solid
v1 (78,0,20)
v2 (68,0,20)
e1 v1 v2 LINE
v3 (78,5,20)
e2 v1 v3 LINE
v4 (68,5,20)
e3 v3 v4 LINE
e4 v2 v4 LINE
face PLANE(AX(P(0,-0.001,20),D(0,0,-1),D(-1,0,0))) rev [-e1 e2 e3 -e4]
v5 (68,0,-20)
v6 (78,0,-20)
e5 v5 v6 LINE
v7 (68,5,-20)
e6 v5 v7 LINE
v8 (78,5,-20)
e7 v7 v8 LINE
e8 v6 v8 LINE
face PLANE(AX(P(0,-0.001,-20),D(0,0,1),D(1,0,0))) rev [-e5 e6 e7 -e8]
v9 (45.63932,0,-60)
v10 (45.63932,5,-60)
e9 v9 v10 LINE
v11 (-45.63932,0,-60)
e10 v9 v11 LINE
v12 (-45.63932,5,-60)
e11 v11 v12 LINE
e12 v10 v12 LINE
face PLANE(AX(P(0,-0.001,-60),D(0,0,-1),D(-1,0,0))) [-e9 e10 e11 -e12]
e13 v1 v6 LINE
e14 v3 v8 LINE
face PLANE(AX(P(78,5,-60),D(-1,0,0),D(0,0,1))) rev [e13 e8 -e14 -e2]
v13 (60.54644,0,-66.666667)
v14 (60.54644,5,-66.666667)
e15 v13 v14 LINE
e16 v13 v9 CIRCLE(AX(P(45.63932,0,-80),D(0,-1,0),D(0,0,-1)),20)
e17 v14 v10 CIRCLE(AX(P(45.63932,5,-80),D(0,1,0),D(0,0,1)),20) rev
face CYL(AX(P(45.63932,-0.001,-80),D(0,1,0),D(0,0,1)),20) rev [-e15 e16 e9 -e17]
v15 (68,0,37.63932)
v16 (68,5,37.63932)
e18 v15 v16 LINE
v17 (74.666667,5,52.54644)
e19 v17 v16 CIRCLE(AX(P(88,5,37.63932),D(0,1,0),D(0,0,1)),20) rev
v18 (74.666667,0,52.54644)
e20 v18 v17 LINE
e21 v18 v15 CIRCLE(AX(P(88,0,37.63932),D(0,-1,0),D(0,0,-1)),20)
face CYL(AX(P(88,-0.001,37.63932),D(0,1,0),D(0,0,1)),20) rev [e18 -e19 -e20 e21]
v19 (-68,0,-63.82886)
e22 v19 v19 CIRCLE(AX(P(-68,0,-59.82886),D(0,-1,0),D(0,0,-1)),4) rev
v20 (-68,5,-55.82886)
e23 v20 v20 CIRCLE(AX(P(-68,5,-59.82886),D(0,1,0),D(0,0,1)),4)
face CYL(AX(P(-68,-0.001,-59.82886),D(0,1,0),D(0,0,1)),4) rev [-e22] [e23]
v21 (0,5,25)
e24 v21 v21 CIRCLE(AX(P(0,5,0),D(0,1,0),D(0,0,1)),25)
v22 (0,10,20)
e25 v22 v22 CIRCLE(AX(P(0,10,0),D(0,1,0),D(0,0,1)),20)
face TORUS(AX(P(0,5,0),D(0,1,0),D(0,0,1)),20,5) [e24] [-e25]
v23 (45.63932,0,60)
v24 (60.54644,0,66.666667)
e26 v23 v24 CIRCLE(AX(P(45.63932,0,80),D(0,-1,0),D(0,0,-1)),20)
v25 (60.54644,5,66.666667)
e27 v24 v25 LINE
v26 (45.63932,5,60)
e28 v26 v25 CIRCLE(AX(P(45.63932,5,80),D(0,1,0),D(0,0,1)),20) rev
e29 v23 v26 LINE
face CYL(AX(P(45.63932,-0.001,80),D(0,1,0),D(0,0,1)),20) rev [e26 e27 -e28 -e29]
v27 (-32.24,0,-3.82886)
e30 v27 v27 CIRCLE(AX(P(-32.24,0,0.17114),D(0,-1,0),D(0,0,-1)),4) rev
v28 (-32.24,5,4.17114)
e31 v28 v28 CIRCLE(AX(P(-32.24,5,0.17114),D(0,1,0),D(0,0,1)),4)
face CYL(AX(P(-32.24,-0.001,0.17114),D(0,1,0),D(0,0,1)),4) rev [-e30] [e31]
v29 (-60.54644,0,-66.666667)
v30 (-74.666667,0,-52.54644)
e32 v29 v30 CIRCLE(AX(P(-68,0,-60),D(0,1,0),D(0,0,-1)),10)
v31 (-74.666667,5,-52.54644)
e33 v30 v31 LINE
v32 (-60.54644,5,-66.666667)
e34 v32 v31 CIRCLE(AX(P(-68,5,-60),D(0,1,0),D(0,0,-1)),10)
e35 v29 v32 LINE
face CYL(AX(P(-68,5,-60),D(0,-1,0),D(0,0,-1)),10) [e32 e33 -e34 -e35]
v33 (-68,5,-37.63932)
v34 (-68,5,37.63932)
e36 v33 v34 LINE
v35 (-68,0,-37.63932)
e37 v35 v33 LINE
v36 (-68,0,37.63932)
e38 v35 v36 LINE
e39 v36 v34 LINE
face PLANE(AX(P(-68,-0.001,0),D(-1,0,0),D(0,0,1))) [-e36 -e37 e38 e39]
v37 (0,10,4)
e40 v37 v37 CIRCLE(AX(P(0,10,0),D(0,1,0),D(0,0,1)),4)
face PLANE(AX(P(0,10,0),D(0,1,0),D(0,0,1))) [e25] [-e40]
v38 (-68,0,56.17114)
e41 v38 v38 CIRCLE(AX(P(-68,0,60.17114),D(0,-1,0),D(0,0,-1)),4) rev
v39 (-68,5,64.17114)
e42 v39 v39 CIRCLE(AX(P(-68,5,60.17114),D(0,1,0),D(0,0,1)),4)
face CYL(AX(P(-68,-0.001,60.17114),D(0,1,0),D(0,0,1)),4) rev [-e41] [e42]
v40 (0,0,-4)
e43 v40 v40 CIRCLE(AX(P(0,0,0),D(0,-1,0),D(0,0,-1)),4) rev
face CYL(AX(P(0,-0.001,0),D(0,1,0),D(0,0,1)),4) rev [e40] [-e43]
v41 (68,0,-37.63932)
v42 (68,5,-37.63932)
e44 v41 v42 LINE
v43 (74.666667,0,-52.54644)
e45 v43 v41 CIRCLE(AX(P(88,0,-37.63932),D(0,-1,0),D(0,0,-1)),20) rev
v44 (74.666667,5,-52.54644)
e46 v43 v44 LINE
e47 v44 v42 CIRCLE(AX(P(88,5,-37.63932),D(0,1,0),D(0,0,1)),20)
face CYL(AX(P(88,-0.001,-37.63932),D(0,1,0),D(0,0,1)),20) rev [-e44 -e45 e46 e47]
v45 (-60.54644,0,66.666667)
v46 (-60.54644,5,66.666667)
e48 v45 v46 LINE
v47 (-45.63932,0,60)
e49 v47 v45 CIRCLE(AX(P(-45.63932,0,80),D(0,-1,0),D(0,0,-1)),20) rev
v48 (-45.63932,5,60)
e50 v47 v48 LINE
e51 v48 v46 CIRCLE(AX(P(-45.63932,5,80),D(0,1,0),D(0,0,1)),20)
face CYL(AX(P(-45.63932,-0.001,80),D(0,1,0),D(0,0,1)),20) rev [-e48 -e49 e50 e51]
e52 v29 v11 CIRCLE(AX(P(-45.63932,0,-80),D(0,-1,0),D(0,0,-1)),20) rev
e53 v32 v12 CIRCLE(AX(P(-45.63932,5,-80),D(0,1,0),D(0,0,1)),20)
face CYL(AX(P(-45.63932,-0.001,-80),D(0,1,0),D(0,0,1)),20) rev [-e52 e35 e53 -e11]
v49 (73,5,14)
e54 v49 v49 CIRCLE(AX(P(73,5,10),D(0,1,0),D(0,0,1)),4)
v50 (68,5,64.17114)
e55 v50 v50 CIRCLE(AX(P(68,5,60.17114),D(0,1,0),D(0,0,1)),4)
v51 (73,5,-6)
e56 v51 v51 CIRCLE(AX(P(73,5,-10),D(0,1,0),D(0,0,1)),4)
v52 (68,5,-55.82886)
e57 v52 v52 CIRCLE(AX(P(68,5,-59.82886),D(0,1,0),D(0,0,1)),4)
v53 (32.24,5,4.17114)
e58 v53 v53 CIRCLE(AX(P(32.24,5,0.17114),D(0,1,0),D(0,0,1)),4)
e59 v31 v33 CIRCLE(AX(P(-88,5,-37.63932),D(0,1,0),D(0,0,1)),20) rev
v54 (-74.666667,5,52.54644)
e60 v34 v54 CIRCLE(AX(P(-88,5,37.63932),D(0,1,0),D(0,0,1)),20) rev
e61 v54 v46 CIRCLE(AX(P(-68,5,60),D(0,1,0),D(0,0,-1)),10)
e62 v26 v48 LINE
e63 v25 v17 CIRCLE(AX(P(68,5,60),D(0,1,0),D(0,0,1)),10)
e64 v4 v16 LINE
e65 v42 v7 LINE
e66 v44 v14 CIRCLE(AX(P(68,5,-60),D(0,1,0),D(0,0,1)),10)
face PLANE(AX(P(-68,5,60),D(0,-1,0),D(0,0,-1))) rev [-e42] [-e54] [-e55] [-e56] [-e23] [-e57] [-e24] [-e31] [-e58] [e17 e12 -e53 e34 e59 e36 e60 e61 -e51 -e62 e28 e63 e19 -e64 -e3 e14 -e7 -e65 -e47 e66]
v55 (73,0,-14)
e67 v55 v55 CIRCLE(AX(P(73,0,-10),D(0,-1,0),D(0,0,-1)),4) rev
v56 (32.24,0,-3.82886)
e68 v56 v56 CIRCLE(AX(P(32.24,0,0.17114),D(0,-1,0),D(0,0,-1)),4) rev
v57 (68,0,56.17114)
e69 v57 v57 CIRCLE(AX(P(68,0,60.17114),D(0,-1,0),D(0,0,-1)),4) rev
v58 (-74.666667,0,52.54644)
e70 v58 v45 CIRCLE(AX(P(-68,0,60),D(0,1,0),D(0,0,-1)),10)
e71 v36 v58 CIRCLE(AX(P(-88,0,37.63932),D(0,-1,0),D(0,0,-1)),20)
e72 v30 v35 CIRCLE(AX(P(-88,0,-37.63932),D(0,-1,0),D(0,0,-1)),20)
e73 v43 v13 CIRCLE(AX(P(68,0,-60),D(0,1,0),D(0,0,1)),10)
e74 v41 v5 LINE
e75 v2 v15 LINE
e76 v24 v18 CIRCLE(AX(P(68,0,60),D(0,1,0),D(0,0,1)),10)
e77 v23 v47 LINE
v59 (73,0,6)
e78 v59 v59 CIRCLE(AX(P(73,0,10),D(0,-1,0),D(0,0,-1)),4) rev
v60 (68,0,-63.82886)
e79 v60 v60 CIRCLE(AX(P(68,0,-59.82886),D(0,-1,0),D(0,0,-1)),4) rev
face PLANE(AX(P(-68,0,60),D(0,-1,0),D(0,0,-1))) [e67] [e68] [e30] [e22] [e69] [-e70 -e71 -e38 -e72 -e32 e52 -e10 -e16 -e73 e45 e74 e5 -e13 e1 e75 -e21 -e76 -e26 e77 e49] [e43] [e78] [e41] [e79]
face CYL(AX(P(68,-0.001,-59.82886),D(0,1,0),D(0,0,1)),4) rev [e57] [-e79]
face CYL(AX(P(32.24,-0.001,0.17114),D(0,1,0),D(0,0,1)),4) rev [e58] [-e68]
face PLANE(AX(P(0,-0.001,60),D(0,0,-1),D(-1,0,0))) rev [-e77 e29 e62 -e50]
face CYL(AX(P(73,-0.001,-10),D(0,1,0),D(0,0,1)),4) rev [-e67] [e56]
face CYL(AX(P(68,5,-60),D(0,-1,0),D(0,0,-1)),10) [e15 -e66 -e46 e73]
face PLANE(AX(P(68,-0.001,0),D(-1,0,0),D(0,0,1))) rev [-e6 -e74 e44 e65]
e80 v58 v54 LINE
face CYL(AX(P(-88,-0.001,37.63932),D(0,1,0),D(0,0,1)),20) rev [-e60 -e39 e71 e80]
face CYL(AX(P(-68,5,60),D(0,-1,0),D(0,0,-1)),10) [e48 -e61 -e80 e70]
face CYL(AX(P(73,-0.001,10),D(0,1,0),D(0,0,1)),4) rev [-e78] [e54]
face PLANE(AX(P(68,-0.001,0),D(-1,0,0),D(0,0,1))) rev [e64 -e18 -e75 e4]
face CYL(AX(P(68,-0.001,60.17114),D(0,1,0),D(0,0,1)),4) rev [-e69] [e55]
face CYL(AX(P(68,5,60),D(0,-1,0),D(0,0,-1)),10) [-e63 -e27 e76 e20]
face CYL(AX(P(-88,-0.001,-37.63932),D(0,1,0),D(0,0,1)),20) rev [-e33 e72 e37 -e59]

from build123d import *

# Parameters (mm, degrees)
SALIENTE_EXTRUIR1_DEPTH = 5
CROQUIS3_R              = 25
SALIENTE_EXTRUIR2_DEPTH = 5
CORTAR_EXTRUIR1_REACH   = 107.281
CROQUIS4_R              = 4
CORTAR_EXTRUIR2_REACH   = 106.924
CROQUIS5_R              = 4
CORTAR_EXTRUIR8_REACH   = 106.924
CROQUIS12_R             = 4
REDONDEO2_R             = 5


with BuildPart() as part:
    # Croquis1 → Saliente-Extruir1 (new body)
    with BuildSketch(Plane(origin=(0, 0, 0), x_dir=(1, 0, 0), z_dir=(0, 1, 0))):
        with BuildLine():
            Line((78, 60), (78, -60))
            ThreePointArc((78, -60), (75.071067812, -67.071067812), (68, -70))
            Line((68, -70), (-68, -70))
            ThreePointArc((-68, -70), (-75.071067812, -67.071067812), (-78, -60))
            Line((-78, -60), (-78, 60))
            ThreePointArc((-78, 60), (-75.071067812, 67.071067812), (-68, 70))
            Line((-68, 70), (68, 70))
            ThreePointArc((68, 70), (75.071067812, 67.071067812), (78, 60))
        make_face()
    extrude(amount=SALIENTE_EXTRUIR1_DEPTH)

    # Croquis3 → Saliente-Extruir2 (add)
    with BuildSketch(Plane(origin=(0, 5, 0), x_dir=(1, 0, 0), z_dir=(0, 1, 0))):
        with Locations(Location((0, 0, 0), (0, 0, 270))):
            Circle(CROQUIS3_R)
    extrude(amount=SALIENTE_EXTRUIR2_DEPTH)

    # Croquis4 → Cortar-Extruir1 (cut, up to next)
    with BuildSketch(Plane(origin=(0, 10, 0), x_dir=(1, 0, 0), z_dir=(0, 1, 0)), mode=Mode.PRIVATE) as cortar_extruir1_sk1:
        with Locations(Location((0, 0, 0), (0, 0, 270))):
            Circle(CROQUIS4_R)
    cortar_extruir1_tool1 = extrude(cortar_extruir1_sk1.sketch, amount=-CORTAR_EXTRUIR1_REACH, mode=Mode.PRIVATE) & part.part
    add(cortar_extruir1_tool1.solids().sort_by_distance((0, 10, 0))[0], mode=Mode.SUBTRACT)

    # Croquis5 → Cortar-Extruir2 (cut, up to next)
    with BuildSketch(Plane(origin=(0, 5, 0), x_dir=(1, 0, 0), z_dir=(0, 1, 0)), mode=Mode.PRIVATE) as cortar_extruir2_sk1:
        with Locations(Location((-68, -60.171139927, 0), (0, 0, 270))):
            Circle(CROQUIS5_R)
    cortar_extruir2_tool1 = extrude(cortar_extruir2_sk1.sketch, amount=-CORTAR_EXTRUIR2_REACH, mode=Mode.PRIVATE) & part.part
    # Croquis5 → Cortar-Extruir2 (cut, up to next)
    with BuildSketch(Plane(origin=(0, 5, 0), x_dir=(1, 0, 0), z_dir=(0, 1, 0)), mode=Mode.PRIVATE) as cortar_extruir2_sk2:
        with Locations(Location((-68, 59.828860073, 0), (0, 0, 270))):
            Circle(CROQUIS5_R)
    cortar_extruir2_tool2 = extrude(cortar_extruir2_sk2.sketch, amount=-CORTAR_EXTRUIR2_REACH, mode=Mode.PRIVATE) & part.part
    # Croquis5 → Cortar-Extruir2 (cut, up to next)
    with BuildSketch(Plane(origin=(0, 5, 0), x_dir=(1, 0, 0), z_dir=(0, 1, 0)), mode=Mode.PRIVATE) as cortar_extruir2_sk3:
        with Locations(Location((68, -60.171139927, 0), (0, 0, 270))):
            Circle(CROQUIS5_R)
    cortar_extruir2_tool3 = extrude(cortar_extruir2_sk3.sketch, amount=-CORTAR_EXTRUIR2_REACH, mode=Mode.PRIVATE) & part.part
    # Croquis5 → Cortar-Extruir2 (cut, up to next)
    with BuildSketch(Plane(origin=(0, 5, 0), x_dir=(1, 0, 0), z_dir=(0, 1, 0)), mode=Mode.PRIVATE) as cortar_extruir2_sk4:
        with Locations(Location((68, 59.828860073, 0), (0, 0, 270))):
            Circle(CROQUIS5_R)
    cortar_extruir2_tool4 = extrude(cortar_extruir2_sk4.sketch, amount=-CORTAR_EXTRUIR2_REACH, mode=Mode.PRIVATE) & part.part
    # Croquis5 → Cortar-Extruir2 (cut, up to next)
    with BuildSketch(Plane(origin=(0, 5, 0), x_dir=(1, 0, 0), z_dir=(0, 1, 0)), mode=Mode.PRIVATE) as cortar_extruir2_sk5:
        with Locations(Location((32.24, -0.171139927, 0), (0, 0, 270))):
            Circle(CROQUIS5_R)
    cortar_extruir2_tool5 = extrude(cortar_extruir2_sk5.sketch, amount=-CORTAR_EXTRUIR2_REACH, mode=Mode.PRIVATE) & part.part
    # Croquis5 → Cortar-Extruir2 (cut, up to next)
    with BuildSketch(Plane(origin=(0, 5, 0), x_dir=(1, 0, 0), z_dir=(0, 1, 0)), mode=Mode.PRIVATE) as cortar_extruir2_sk6:
        with Locations(Location((-32.24, -0.171139927, 0), (0, 0, 270))):
            Circle(CROQUIS5_R)
    cortar_extruir2_tool6 = extrude(cortar_extruir2_sk6.sketch, amount=-CORTAR_EXTRUIR2_REACH, mode=Mode.PRIVATE) & part.part
    add(cortar_extruir2_tool1.solids().sort_by_distance((-68, 5, 60.17114))[0], mode=Mode.SUBTRACT)
    add(cortar_extruir2_tool2.solids().sort_by_distance((-68, 5, -59.82886))[0], mode=Mode.SUBTRACT)
    add(cortar_extruir2_tool3.solids().sort_by_distance((68, 5, 60.17114))[0], mode=Mode.SUBTRACT)
    add(cortar_extruir2_tool4.solids().sort_by_distance((68, 5, -59.82886))[0], mode=Mode.SUBTRACT)
    add(cortar_extruir2_tool5.solids().sort_by_distance((32.24, 5, 0.17114))[0], mode=Mode.SUBTRACT)
    add(cortar_extruir2_tool6.solids().sort_by_distance((-32.24, 5, 0.17114))[0], mode=Mode.SUBTRACT)

    # Croquis12 → Cortar-Extruir8 (cut, up to next)
    with BuildSketch(Plane(origin=(0, 5, 0), x_dir=(1, 0, 0), z_dir=(0, 1, 0)), mode=Mode.PRIVATE) as cortar_extruir8_sk1:
        with BuildLine():
            Line((68, 70), (-68, 70))
            ThreePointArc((-68, 70), (-63.917517095, 69.128709292), (-60.546440075, 66.666666667))
            ThreePointArc((-60.546440075, 66.666666667), (-53.804286034, 61.742581416), (-45.639320225, 60))
            Line((-45.639320225, 60), (45.639320225, 60))
            ThreePointArc((45.639320225, 60), (53.804286034, 61.742581416), (60.546440075, 66.666666667))
            ThreePointArc((60.546440075, 66.666666667), (63.917517095, 69.128709292), (68, 70))
        make_face()
    cortar_extruir8_tool1 = extrude(cortar_extruir8_sk1.sketch, amount=-CORTAR_EXTRUIR8_REACH, mode=Mode.PRIVATE) & part.part
    # Croquis12 → Cortar-Extruir8 (cut, up to next)
    with BuildSketch(Plane(origin=(0, 5, 0), x_dir=(1, 0, 0), z_dir=(0, 1, 0)), mode=Mode.PRIVATE) as cortar_extruir8_sk2:
        with BuildLine():
            Line((-78, 60), (-78, -60))
            ThreePointArc((-78, -60), (-77.128709292, -55.917517095), (-74.666666667, -52.546440075))
            ThreePointArc((-74.666666667, -52.546440075), (-69.742581416, -45.804286034), (-68, -37.639320225))
            Line((-68, -37.639320225), (-68, 37.639320225))
            ThreePointArc((-68, 37.639320225), (-69.742581416, 45.804286034), (-74.666666667, 52.546440075))
            ThreePointArc((-74.666666667, 52.546440075), (-77.128709292, 55.917517095), (-78, 60))
        make_face()
    cortar_extruir8_tool2 = extrude(cortar_extruir8_sk2.sketch, amount=-CORTAR_EXTRUIR8_REACH, mode=Mode.PRIVATE) & part.part
    # Croquis12 → Cortar-Extruir8 (cut, up to next)
    with BuildSketch(Plane(origin=(0, 5, 0), x_dir=(1, 0, 0), z_dir=(0, 1, 0)), mode=Mode.PRIVATE) as cortar_extruir8_sk3:
        with BuildLine():
            Line((-68, -70), (68, -70))
            ThreePointArc((68, -70), (63.917517095, -69.128709292), (60.546440075, -66.666666667))
            ThreePointArc((60.546440075, -66.666666667), (53.804286034, -61.742581416), (45.639320225, -60))
            Line((45.639320225, -60), (-45.639320225, -60))
            ThreePointArc((-45.639320225, -60), (-53.804286034, -61.742581416), (-60.546440075, -66.666666667))
            ThreePointArc((-60.546440075, -66.666666667), (-63.917517095, -69.128709292), (-68, -70))
        make_face()
    cortar_extruir8_tool3 = extrude(cortar_extruir8_sk3.sketch, amount=-CORTAR_EXTRUIR8_REACH, mode=Mode.PRIVATE) & part.part
    # Croquis12 → Cortar-Extruir8 (cut, up to next)
    with BuildSketch(Plane(origin=(0, 5, 0), x_dir=(1, 0, 0), z_dir=(0, 1, 0)), mode=Mode.PRIVATE) as cortar_extruir8_sk4:
        with BuildLine():
            ThreePointArc((74.666666667, -52.546440075), (77.128709292, -55.917517095), (78, -60))
            Line((78, -60), (78, -20))
            Line((78, -20), (68, -20))
            Line((68, -20), (68, -37.639320225))
            ThreePointArc((68, -37.639320225), (69.742581416, -45.804286034), (74.666666667, -52.546440075))
        make_face()
    cortar_extruir8_tool4 = extrude(cortar_extruir8_sk4.sketch, amount=-CORTAR_EXTRUIR8_REACH, mode=Mode.PRIVATE) & part.part
    # Croquis12 → Cortar-Extruir8 (cut, up to next)
    with BuildSketch(Plane(origin=(0, 5, 0), x_dir=(1, 0, 0), z_dir=(0, 1, 0)), mode=Mode.PRIVATE) as cortar_extruir8_sk5:
        with BuildLine():
            Line((68, 20), (78, 20))
            Line((78, 20), (78, 60))
            ThreePointArc((78, 60), (77.128709292, 55.917517095), (74.666666667, 52.546440075))
            ThreePointArc((74.666666667, 52.546440075), (69.742581416, 45.804286034), (68, 37.639320225))
            Line((68, 37.639320225), (68, 20))
        make_face()
    cortar_extruir8_tool5 = extrude(cortar_extruir8_sk5.sketch, amount=-CORTAR_EXTRUIR8_REACH, mode=Mode.PRIVATE) & part.part
    # Croquis12 → Cortar-Extruir8 (cut, up to next)
    with BuildSketch(Plane(origin=(0, 5, 0), x_dir=(1, 0, 0), z_dir=(0, 1, 0)), mode=Mode.PRIVATE) as cortar_extruir8_sk6:
        with Locations(Location((73, 10, 0), (0, 0, 270))):
            Circle(CROQUIS12_R)
    cortar_extruir8_tool6 = extrude(cortar_extruir8_sk6.sketch, amount=-CORTAR_EXTRUIR8_REACH, mode=Mode.PRIVATE) & part.part
    # Croquis12 → Cortar-Extruir8 (cut, up to next)
    with BuildSketch(Plane(origin=(0, 5, 0), x_dir=(1, 0, 0), z_dir=(0, 1, 0)), mode=Mode.PRIVATE) as cortar_extruir8_sk7:
        with Locations(Location((73, -10, 0), (0, 0, 270))):
            Circle(CROQUIS12_R)
    cortar_extruir8_tool7 = extrude(cortar_extruir8_sk7.sketch, amount=-CORTAR_EXTRUIR8_REACH, mode=Mode.PRIVATE) & part.part
    add(cortar_extruir8_tool1.solids().sort_by_distance((0, 5, -65.214104))[0], mode=Mode.SUBTRACT)
    add(cortar_extruir8_tool2.solids().sort_by_distance((-73.248187, 5, 0))[0], mode=Mode.SUBTRACT)
    add(cortar_extruir8_tool3.solids().sort_by_distance((0, 5, 65.214104))[0], mode=Mode.SUBTRACT)
    add(cortar_extruir8_tool4.solids().sort_by_distance((73.412248, 5, 35.448838))[0], mode=Mode.SUBTRACT)
    add(cortar_extruir8_tool5.solids().sort_by_distance((73.412248, 5, -35.448838))[0], mode=Mode.SUBTRACT)
    add(cortar_extruir8_tool6.solids().sort_by_distance((73, 5, -10))[0], mode=Mode.SUBTRACT)
    add(cortar_extruir8_tool7.solids().sort_by_distance((73, 5, 10))[0], mode=Mode.SUBTRACT)

    # Redondeo2
    redondeo2_edges = [part.edges().sort_by_distance(p)[0] for p in [
        (0, 10, -25),
    ]]
    fillet(redondeo2_edges, radius=REDONDEO2_R - 0.0001)  # a hair under: the kernel refuses the full size


solid = part.part
